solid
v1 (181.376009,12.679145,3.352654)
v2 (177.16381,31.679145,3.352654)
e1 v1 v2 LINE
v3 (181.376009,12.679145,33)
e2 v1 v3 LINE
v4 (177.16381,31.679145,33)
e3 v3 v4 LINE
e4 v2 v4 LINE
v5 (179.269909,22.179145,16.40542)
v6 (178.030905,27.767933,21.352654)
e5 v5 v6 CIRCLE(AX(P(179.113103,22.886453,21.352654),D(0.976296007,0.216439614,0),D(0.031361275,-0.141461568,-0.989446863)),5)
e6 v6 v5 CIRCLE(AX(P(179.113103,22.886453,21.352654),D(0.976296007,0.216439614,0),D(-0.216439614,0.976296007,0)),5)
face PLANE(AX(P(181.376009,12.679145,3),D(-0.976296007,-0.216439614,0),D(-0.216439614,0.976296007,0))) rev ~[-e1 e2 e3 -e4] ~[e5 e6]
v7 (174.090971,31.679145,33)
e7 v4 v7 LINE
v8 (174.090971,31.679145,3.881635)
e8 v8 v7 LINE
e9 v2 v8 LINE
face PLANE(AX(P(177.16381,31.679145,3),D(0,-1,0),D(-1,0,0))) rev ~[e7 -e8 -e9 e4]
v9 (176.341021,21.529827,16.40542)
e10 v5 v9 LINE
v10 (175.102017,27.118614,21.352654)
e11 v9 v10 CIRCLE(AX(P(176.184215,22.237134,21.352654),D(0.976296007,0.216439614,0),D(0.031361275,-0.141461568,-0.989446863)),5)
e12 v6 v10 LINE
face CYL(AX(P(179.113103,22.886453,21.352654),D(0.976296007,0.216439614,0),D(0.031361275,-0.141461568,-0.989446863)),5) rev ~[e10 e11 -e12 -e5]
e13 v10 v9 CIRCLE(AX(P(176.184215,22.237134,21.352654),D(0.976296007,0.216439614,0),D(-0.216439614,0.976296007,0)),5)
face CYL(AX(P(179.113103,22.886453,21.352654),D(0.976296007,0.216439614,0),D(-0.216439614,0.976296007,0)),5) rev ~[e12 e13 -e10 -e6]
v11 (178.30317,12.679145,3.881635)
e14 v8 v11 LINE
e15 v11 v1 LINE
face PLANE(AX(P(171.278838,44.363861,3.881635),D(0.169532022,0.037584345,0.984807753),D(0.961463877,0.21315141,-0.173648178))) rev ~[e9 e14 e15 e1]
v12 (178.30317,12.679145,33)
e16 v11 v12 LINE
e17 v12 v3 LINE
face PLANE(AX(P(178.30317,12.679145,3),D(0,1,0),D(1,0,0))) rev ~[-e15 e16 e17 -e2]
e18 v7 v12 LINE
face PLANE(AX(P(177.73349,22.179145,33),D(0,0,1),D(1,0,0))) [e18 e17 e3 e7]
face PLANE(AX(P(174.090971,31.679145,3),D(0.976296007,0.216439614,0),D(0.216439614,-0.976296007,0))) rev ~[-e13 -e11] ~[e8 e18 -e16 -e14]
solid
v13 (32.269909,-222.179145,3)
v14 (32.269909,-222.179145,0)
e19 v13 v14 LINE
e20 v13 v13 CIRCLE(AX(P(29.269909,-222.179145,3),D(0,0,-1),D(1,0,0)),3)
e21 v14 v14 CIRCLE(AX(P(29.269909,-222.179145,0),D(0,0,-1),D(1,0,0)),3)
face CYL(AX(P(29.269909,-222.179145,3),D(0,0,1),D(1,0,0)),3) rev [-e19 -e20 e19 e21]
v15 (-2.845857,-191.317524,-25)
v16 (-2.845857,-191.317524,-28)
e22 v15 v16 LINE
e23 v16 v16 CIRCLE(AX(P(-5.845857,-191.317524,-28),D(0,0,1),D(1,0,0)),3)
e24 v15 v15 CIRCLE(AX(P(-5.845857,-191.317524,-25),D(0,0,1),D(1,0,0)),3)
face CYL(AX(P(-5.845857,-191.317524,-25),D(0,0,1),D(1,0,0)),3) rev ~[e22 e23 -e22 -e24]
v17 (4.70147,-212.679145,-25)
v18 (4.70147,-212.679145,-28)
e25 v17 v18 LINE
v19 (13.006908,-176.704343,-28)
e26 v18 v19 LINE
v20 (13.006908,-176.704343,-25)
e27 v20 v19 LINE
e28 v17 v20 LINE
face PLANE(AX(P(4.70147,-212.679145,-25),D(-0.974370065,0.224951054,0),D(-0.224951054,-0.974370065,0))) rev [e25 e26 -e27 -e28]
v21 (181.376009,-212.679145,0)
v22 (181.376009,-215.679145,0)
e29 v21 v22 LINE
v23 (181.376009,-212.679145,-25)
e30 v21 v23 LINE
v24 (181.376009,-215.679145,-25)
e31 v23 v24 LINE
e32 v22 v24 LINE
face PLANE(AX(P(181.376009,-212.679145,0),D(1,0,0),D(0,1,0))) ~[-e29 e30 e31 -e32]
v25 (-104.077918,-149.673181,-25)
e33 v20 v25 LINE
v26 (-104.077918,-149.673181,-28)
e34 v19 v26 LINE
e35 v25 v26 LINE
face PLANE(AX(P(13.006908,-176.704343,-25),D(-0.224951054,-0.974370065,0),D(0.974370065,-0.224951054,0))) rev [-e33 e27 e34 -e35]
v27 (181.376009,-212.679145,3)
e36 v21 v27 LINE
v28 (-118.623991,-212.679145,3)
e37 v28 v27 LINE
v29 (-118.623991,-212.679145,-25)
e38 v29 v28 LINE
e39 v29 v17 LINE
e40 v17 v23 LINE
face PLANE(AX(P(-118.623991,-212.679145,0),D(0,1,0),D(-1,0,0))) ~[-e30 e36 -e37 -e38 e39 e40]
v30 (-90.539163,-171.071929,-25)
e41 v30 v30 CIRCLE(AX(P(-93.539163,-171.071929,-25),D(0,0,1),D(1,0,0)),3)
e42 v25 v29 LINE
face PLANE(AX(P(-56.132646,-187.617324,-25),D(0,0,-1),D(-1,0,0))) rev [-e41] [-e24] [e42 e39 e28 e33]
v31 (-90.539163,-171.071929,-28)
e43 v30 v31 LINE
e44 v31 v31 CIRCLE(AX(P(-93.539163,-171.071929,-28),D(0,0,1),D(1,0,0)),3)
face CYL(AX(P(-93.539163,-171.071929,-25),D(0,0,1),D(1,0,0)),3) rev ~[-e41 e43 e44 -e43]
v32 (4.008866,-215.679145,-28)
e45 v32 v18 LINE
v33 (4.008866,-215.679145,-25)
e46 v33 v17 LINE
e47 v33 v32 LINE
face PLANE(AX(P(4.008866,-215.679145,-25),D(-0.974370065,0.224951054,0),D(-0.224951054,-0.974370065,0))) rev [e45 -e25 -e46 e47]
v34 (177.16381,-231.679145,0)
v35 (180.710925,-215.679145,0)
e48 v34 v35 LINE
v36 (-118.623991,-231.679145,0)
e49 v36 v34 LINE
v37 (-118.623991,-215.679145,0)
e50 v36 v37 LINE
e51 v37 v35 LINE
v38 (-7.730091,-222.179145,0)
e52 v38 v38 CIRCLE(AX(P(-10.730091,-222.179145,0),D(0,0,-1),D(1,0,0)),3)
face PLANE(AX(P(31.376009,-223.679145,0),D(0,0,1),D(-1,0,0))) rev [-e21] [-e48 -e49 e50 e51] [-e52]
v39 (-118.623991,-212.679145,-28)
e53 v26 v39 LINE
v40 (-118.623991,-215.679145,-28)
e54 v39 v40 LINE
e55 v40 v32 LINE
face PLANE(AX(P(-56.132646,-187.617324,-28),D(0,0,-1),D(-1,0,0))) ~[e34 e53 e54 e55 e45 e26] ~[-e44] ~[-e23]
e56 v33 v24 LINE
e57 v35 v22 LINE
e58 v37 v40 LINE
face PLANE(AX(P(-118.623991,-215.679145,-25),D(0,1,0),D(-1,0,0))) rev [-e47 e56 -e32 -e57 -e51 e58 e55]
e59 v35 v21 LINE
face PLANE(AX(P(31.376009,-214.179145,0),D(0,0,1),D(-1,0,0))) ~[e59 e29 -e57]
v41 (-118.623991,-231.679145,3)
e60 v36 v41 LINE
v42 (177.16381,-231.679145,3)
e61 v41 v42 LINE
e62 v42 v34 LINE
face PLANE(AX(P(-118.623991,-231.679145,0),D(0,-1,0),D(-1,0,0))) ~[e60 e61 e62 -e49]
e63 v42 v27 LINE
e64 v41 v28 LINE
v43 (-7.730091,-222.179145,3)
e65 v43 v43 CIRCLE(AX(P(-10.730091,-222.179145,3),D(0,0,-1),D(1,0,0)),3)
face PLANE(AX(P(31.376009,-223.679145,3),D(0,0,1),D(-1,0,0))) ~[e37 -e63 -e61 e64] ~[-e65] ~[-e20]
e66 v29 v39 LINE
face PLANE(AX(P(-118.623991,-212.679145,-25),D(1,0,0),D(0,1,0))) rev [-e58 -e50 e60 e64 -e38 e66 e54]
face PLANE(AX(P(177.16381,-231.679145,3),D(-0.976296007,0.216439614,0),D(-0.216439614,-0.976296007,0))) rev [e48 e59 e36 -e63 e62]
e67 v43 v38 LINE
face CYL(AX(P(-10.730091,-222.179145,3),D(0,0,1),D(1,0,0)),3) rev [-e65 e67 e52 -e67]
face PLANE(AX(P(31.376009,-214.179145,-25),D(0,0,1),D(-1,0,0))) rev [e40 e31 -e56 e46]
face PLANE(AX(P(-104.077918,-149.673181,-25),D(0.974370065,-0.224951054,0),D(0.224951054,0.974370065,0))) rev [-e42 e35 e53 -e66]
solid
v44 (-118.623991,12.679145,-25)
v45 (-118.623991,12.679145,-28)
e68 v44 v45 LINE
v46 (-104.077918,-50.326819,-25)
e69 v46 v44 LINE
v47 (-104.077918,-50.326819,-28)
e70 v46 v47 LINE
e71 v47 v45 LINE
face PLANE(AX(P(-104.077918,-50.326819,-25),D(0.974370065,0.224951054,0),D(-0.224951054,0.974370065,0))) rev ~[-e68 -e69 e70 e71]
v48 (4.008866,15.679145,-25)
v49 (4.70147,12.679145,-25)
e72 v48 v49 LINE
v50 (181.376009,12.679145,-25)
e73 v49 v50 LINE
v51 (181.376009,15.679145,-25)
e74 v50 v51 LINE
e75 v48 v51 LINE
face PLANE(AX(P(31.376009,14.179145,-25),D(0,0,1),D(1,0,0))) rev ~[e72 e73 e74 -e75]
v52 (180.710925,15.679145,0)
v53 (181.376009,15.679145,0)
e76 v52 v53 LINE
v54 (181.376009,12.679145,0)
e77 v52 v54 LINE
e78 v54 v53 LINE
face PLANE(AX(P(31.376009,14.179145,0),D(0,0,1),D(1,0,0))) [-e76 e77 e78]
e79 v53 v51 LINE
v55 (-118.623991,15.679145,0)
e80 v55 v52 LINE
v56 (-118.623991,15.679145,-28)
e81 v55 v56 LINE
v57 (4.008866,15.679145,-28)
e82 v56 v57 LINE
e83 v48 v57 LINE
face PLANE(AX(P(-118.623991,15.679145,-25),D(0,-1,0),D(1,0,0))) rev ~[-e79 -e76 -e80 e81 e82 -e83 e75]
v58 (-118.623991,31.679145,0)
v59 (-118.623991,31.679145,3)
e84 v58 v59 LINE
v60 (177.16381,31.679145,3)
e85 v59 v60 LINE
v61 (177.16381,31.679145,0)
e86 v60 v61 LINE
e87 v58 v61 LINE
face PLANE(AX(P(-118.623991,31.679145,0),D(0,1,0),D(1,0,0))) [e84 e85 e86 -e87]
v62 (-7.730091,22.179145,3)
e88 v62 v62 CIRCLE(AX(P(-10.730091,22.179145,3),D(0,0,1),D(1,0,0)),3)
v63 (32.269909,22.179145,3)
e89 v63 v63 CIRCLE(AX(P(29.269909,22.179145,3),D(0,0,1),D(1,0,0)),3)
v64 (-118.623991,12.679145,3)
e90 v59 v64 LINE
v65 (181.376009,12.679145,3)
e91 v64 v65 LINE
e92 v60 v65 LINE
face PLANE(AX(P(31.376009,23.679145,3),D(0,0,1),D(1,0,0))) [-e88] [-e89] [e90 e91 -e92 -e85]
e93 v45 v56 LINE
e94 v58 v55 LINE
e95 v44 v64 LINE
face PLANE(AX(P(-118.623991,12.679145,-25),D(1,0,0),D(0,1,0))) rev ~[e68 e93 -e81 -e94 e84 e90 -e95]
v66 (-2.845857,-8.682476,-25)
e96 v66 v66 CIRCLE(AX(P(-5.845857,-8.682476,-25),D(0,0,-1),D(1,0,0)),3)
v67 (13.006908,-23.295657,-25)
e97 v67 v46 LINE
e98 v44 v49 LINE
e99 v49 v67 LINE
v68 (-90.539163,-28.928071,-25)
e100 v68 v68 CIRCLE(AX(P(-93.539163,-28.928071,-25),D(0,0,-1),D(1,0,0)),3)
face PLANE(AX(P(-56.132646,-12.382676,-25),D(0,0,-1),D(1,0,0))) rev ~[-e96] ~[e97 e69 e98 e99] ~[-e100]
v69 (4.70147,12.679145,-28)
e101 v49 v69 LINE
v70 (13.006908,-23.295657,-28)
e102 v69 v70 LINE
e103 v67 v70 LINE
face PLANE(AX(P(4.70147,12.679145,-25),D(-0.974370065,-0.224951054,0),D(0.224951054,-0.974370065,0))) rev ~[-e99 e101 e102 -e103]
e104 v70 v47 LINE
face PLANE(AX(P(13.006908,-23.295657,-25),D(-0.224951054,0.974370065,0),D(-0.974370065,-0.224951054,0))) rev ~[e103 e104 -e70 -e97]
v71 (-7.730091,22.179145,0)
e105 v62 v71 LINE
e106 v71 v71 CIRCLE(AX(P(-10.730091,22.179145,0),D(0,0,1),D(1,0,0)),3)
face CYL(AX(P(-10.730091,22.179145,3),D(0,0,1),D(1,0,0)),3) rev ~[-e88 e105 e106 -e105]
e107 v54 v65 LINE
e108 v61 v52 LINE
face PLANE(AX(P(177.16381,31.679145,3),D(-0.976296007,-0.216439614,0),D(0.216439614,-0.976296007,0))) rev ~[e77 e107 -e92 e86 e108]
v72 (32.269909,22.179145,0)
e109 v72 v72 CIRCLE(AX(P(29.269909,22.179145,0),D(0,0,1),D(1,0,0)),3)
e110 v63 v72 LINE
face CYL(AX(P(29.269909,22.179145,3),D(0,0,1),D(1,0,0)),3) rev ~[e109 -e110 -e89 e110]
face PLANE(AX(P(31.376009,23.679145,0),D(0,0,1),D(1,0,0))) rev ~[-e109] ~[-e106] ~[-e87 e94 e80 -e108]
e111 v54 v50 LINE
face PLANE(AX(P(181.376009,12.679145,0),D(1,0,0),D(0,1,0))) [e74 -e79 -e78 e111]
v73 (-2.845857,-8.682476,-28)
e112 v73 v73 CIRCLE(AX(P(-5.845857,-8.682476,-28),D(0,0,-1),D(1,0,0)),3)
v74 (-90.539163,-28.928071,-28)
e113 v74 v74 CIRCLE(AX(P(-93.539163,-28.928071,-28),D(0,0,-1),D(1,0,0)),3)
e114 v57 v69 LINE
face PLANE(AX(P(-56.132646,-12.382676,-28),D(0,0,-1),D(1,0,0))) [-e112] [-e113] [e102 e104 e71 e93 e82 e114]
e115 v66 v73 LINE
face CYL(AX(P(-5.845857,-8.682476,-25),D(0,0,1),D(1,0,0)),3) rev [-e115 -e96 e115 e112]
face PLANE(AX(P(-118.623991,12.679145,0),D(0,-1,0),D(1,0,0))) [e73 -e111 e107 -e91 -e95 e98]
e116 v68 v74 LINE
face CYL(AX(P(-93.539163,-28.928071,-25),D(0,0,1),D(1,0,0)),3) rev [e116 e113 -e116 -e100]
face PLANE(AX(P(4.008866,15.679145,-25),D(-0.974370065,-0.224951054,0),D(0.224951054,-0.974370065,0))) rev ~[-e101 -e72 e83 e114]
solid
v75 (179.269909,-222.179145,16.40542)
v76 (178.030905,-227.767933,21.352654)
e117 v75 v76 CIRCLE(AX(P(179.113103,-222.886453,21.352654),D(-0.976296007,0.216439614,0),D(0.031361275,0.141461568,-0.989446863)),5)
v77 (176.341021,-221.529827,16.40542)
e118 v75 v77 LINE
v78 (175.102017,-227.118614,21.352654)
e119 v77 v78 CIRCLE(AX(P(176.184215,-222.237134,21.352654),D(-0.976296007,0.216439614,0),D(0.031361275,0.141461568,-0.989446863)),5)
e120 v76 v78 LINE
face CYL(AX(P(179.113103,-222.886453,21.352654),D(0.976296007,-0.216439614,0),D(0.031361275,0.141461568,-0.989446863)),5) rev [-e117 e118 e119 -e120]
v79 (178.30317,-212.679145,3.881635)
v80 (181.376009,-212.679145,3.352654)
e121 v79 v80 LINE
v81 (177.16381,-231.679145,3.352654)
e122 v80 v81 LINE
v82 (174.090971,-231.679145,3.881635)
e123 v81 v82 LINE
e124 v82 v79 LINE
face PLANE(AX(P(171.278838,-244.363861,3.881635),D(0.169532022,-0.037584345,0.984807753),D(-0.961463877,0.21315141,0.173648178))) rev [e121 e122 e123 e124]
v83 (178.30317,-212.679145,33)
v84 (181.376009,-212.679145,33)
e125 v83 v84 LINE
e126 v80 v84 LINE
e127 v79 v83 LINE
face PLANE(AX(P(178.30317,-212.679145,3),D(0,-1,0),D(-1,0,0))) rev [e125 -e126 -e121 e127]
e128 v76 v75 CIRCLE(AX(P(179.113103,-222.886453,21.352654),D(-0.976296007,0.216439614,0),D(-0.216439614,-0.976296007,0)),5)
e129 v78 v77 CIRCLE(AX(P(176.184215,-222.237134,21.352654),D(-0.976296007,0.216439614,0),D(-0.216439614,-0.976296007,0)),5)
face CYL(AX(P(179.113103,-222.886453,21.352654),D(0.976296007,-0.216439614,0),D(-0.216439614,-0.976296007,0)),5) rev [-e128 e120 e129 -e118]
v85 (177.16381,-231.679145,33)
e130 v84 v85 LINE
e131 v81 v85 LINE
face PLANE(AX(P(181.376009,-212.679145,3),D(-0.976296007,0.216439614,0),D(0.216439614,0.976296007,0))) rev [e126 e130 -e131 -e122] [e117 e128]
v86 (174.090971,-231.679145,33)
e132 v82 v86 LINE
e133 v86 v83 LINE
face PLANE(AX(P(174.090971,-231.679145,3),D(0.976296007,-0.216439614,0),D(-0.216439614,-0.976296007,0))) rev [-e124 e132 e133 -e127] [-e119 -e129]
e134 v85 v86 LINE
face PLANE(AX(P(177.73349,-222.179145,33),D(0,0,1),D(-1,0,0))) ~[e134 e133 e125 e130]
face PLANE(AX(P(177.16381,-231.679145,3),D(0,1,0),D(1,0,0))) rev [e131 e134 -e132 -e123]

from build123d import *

# Parameters (mm, degrees)
F0_W        = 300
F0_H        = 16
F0_H_2      = 3
F1_DEPTH    = 3
F3_DEPTH    = 3.001
F5_DEPTH    = 30
F6_T1_DEPTH = 45.4466987362
F8_DEPTH    = 292.889802136
F10_DEPTH   = 25
F11_R       = 3
F12_DEPTH   = 3
F4_R        = 3
F13_DEPTH   = 31.001


# Not quite as in the source:
# - a fillet or chamfer that OpenCascade refuses, or shapes differently, is made with other operations: its cross-section is extruded or revolved along the edge and cut away or added


with BuildPart() as f1:
    # F0 (on Top) → F1 (new body)
    with BuildSketch(Plane.XY):
        with Locations((31.376008536, 23.679145366)):
            Rectangle(F0_W, F0_H)
        with Locations((31.376008536, 14.179145366)):
            Rectangle(F0_W, F0_H_2)
    extrude(amount=F1_DEPTH)

    # F2 (on face) → F3 (cut, through all)
    with BuildSketch(Plane.XY.offset(3)):
        Polygon((181.376008536, 31.679145366), (177.1638099458, 31.679145366), (181.376008536, 12.679145366), align=None)
    extrude(amount=-F3_DEPTH, mode=Mode.SUBTRACT)

    # F0 (on Top) → F10 (join)
    with BuildSketch(Plane.XY):
        with Locations((31.376008536, 14.179145366)):
            Rectangle(F0_W, F0_H_2)
    extrude(amount=-F10_DEPTH)

    # F11 (on face) → F12 (join)
    with BuildSketch(Plane(origin=(0, 0, -25), x_dir=(1, 0, 0), z_dir=(0, 0, -1))):
        Polygon((-104.0779183868, 50.3268192335), (-118.623991464, -12.679145366), (4.7014701045, -12.679145366), (13.0069077049, 23.2956572255), align=None)
        with Locations((-5.8458569022, 8.6824761846)):
            Circle(F11_R, mode=Mode.SUBTRACT)
        with Locations((-93.5391627328, 28.9280710755)):
            Circle(F11_R, mode=Mode.SUBTRACT)
        Polygon((4.7014701045, -12.679145366), (-118.623991464, -12.679145366), (-118.623991464, -15.679145366), (4.0088655312, -15.679145366), align=None)
    extrude(amount=F12_DEPTH)

    # F4 (on face) → F13 (cut, through all)
    with BuildSketch(Plane.XY.offset(3)):
        with Locations((29.2699092409, 22.179145366)):
            Circle(F4_R)
        with Locations((-10.7300907591, 22.179145366)):
            Circle(F4_R)
    extrude(amount=-F13_DEPTH, mode=Mode.SUBTRACT)


with BuildPart() as f5:
    # F4 (on face) → F5 (new body)
    with BuildSketch(Plane.XY.offset(3)):
        Polygon((177.1638099458, 31.679145366), (174.0909714028, 31.679145366), (178.3031699931, 12.679145366), (181.376008536, 12.679145366), align=None)
    extrude(amount=F5_DEPTH)

    # F6: chamfer of 5 x 0.8816349035 on 1 edges, made by hand

    # F6_s2 → F6_t1 (cut)
    with BuildSketch(Plane(origin=(-1.3507421597, 6.0928041458, 0), x_dir=(0, 0, 1), z_dir=(0.2164396139, -0.9762960071, 0))):
        Polygon((3.8816349035, -176.8209422491), (3, -181.8209422491), (3, -176.8209422491), align=None)
    extrude(amount=F6_T1_DEPTH, mode=Mode.SUBTRACT)

    # F7 (on face) → F8 (cut, through all)
    with BuildSketch(Plane(origin=(175.5584679144, 38.9203753184, 0), x_dir=(-0.2164396139, 0.9762960071, 0), z_dir=(0.9762960071, 0.2164396139, 0))):
        with BuildLine():
            ThreePointArc((-11.4232179523, 21.3526539614), (-19.6925906243, 25.1356689404), (-17.1476988847, 16.4054196453))
            ThreePointArc((-17.1476988847, 16.4054196453), (-13.1538452802, 17.5696389824), (-11.4232179523, 21.3526539614))
        make_face()
    extrude(amount=-F8_DEPTH, mode=Mode.SUBTRACT)


with BuildPart() as f14_1:
    # F14: instance of F1
    add(f1.part.mirror(Plane.XZ.offset(100)))


with BuildPart() as f14_2:
    # F14: instance of F5
    add(f5.part.mirror(Plane.XZ.offset(100)))


solid = Compound([f1.part, f5.part, f14_1.part, f14_2.part])
